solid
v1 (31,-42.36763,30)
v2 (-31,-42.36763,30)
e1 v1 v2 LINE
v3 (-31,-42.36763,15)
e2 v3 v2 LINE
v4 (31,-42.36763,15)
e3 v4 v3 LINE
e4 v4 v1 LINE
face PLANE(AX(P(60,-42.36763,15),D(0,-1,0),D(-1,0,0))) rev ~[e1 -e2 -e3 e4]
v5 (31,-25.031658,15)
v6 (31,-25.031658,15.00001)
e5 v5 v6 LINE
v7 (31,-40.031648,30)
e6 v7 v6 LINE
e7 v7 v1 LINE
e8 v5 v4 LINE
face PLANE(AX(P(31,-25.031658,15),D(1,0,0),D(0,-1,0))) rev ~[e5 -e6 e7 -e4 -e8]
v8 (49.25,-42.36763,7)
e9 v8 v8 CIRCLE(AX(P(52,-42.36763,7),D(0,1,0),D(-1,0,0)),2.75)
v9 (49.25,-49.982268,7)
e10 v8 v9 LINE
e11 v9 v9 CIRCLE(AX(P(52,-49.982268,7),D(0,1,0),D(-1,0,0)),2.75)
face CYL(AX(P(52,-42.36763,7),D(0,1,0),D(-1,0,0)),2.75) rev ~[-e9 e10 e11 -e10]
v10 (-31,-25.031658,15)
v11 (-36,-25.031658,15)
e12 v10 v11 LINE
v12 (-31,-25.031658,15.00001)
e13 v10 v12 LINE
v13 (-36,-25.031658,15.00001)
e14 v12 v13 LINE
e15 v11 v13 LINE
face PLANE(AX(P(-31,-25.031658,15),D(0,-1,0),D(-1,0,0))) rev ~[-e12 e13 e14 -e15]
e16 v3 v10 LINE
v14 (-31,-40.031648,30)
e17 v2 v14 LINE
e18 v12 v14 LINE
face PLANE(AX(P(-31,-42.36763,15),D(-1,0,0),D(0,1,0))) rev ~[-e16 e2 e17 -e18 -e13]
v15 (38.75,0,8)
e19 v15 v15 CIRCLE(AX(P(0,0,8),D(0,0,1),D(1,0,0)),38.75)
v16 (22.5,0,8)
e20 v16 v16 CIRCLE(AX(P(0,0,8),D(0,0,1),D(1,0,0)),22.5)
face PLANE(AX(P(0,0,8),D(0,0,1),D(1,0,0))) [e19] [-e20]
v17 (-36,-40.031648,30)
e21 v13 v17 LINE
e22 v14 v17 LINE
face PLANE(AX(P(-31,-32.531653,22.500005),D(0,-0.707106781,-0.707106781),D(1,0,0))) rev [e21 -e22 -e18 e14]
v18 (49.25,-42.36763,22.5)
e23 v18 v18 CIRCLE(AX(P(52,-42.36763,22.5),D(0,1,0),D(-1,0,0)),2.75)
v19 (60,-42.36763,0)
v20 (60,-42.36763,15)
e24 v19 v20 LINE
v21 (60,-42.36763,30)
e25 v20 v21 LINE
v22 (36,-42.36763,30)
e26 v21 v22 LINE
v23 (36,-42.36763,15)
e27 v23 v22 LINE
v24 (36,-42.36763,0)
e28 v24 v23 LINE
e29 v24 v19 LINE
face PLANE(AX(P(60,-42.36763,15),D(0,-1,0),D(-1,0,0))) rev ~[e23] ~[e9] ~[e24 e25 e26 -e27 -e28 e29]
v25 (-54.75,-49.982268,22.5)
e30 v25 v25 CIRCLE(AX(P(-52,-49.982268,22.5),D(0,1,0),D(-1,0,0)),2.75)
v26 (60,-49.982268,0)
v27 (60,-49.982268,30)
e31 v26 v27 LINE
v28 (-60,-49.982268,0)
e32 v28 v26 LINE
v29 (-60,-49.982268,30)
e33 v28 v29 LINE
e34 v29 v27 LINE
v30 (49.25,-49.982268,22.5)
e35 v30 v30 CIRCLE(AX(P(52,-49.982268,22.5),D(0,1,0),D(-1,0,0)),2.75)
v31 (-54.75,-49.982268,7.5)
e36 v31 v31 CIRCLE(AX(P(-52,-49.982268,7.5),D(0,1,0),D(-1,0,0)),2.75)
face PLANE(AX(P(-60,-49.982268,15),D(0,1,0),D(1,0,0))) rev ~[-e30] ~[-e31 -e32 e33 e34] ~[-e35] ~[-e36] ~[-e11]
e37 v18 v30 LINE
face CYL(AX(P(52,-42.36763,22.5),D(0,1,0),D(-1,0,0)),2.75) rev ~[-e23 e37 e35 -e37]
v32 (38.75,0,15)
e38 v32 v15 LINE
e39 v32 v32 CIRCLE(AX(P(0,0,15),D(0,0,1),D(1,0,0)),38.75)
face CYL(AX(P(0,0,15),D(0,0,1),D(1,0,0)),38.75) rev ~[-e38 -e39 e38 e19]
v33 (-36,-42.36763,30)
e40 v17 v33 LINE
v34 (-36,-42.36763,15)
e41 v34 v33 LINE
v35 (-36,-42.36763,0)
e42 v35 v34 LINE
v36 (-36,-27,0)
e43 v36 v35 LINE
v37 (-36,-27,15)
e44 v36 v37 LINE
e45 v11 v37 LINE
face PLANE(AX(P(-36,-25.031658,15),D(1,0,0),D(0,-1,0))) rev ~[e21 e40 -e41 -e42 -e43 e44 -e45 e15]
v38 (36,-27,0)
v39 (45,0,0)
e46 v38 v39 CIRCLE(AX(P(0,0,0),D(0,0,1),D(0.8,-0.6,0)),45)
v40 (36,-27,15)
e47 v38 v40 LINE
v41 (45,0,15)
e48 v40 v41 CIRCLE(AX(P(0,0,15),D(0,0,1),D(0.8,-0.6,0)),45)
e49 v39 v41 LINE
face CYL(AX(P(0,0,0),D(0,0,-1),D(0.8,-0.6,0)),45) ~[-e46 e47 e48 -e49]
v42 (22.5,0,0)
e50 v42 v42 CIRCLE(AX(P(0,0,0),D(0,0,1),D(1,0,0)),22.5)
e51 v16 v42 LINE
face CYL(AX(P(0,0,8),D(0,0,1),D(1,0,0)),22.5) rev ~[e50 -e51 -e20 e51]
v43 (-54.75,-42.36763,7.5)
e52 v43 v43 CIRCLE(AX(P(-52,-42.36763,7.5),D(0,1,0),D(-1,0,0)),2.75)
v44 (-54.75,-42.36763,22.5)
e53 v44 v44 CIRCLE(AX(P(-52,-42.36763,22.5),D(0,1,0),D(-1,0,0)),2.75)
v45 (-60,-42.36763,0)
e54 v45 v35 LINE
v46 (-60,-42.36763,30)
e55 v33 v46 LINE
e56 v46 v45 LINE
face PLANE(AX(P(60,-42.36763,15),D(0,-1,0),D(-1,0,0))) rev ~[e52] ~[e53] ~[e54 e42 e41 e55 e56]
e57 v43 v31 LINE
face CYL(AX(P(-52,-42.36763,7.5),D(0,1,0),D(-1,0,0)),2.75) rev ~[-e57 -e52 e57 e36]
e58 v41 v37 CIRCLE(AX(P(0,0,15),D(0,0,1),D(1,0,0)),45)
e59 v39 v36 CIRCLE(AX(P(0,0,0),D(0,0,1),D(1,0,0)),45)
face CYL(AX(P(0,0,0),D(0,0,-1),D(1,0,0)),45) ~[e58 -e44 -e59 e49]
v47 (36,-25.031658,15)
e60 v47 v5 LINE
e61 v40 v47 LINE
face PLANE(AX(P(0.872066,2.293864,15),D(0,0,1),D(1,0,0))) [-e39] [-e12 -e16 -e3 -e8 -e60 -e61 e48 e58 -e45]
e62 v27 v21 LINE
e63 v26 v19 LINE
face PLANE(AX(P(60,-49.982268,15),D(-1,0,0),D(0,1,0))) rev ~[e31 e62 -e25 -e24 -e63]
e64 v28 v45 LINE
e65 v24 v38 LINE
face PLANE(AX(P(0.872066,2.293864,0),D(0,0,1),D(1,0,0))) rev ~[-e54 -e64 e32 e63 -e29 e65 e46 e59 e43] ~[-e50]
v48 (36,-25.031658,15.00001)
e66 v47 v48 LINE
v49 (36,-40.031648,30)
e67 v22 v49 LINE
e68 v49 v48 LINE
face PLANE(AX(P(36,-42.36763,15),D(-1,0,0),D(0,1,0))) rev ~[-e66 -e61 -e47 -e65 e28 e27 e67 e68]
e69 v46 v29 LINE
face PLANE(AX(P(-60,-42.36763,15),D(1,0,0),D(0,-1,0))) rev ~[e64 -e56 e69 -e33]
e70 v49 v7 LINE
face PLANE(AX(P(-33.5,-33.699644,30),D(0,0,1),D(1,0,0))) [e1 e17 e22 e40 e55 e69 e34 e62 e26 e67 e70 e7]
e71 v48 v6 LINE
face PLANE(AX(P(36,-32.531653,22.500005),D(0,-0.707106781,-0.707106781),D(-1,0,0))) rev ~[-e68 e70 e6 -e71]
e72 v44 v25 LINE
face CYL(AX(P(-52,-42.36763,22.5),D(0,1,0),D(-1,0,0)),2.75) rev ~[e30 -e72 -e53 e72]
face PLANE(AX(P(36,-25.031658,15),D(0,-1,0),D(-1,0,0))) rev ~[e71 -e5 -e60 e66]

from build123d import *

# Parameters (mm, degrees)
F0_W      = 24
F0_H      = 7.6146386564
F1_DEPTH  = 15
F2_R      = 38.75
F4_DEPTH  = 7
F5_DEPTH  = 15
F7_DEPTH  = 15
F8_SIZE   = 14.99999
F9_R      = 2.75
F10_DEPTH = 25
F11_R     = 22.5
F12_DEPTH = 25


# Not quite as in the source:
# - a fillet or chamfer is up to 0.001 mm smaller than in the source, because OpenCascade refuses the exact size


with BuildPart() as f1:
    # F0 (on Top) → F1 (new body)
    with BuildSketch(Plane.XY):
        with BuildLine():
            ThreePointArc((36, -27), (42.6907484123, -14.2302494708), (45, 0))
            ThreePointArc((45, 0), (-14.2302494708, 42.6907484123), (-36, -27))
            Line((-36, -27), (36, -27))
        make_face()
        with BuildLine():
            ThreePointArc((-15.1652218257, -42.3676297069), (-26.7116265289, -36.2144861648), (-36, -27))
            Line((-36, -27), (-36, -42.3676297069))
            Line((-36, -42.3676297069), (-15.1652218257, -42.3676297069))
        make_face()
        with BuildLine():
            Line((36, -27), (-36, -27))
            ThreePointArc((-36, -27), (-26.7116265289, -36.2144861648), (-15.1652218257, -42.3676297069))
            Line((-15.1652218257, -42.3676297069), (15.1652218257, -42.3676297069))
            ThreePointArc((15.1652218257, -42.3676297069), (26.7116265289, -36.2144861648), (36, -27))
        make_face()
        with BuildLine():
            Line((15.1652218257, -42.3676297069), (-15.1652218257, -42.3676297069))
            ThreePointArc((-15.1652218257, -42.3676297069), (0, -45), (15.1652218257, -42.3676297069))
        make_face()
        with Locations((-48, -46.174949035)):
            Rectangle(F0_W, F0_H)
        with BuildLine():
            ThreePointArc((15.1652218257, -42.3676297069), (0, -45), (-15.1652218257, -42.3676297069))
            Line((-15.1652218257, -42.3676297069), (-36, -42.3676297069))
            Line((-36, -42.3676297069), (-36, -49.9822683632))
            Line((-36, -49.9822683632), (36, -49.9822683632))
            Line((36, -49.9822683632), (36, -42.3676297069))
            Line((36, -42.3676297069), (15.1652218257, -42.3676297069))
        make_face()
        with Locations((48, -46.174949035)):
            Rectangle(F0_W, F0_H)
        with BuildLine():
            Line((36, -42.3676297069), (36, -27))
            ThreePointArc((36, -27), (26.7116265289, -36.2144861648), (15.1652218257, -42.3676297069))
            Line((15.1652218257, -42.3676297069), (36, -42.3676297069))
        make_face()
    extrude(amount=F1_DEPTH)

    # F2 (on face) → F4 (cut)
    with BuildSketch(Plane.XY.offset(15)):
        Circle(F2_R)
    extrude(amount=-F4_DEPTH, mode=Mode.SUBTRACT)

    # F3 (on face) → F5 (join)
    with BuildSketch(Plane.XY.offset(15)):
        Polygon((-36, -42.3676297069), (-60, -42.3676297069), (-60, -49.9822683632), (60, -49.9822683632), (60, -42.3676297069), (36, -42.3676297069), align=None)
    extrude(amount=F5_DEPTH)

    # F6 (on face) → F7 (join)
    with BuildSketch(Plane.XY.offset(15)):
        Polygon((-31, -25.031657964), (-36, -25.031657964), (-36, -27), (-36, -42.3676297069), (-31, -42.3676297069), align=None)
        Polygon((36, -42.3676297069), (36, -27), (36, -25.031657964), (31, -25.031657964), (31, -42.3676297069), align=None)
    extrude(amount=F7_DEPTH)

    # F8 (size 15 in the source; OpenCascade refuses exactly that, so slightly less here)
    f8_edges = [f1.edges().sort_by_distance(p)[0] for p in [
        (-33.5, -25.031658, 30),
        (33.5, -25.031658, 30),
    ]]
    chamfer(f8_edges, length=F8_SIZE)

    # F9 (on face) → F10 (cut)
    with BuildSketch(Plane(origin=(0, -42.3676297069, 0), x_dir=(-1, 0, 0), z_dir=(0, 1, 0))):
        with Locations((52, 7.5)):
            Circle(F9_R)
        with Locations((52, 22.5)):
            Circle(F9_R)
        with Locations((-52, 7)):
            Circle(F9_R)
        with Locations((-52, 22.5)):
            Circle(F9_R)
    extrude(amount=-F10_DEPTH, mode=Mode.SUBTRACT)

    # F11 (on face) → F12 (cut)
    with BuildSketch(Plane.XY.offset(8)):
        Circle(F11_R)
    extrude(amount=-F12_DEPTH, mode=Mode.SUBTRACT)


solid = f1.part
